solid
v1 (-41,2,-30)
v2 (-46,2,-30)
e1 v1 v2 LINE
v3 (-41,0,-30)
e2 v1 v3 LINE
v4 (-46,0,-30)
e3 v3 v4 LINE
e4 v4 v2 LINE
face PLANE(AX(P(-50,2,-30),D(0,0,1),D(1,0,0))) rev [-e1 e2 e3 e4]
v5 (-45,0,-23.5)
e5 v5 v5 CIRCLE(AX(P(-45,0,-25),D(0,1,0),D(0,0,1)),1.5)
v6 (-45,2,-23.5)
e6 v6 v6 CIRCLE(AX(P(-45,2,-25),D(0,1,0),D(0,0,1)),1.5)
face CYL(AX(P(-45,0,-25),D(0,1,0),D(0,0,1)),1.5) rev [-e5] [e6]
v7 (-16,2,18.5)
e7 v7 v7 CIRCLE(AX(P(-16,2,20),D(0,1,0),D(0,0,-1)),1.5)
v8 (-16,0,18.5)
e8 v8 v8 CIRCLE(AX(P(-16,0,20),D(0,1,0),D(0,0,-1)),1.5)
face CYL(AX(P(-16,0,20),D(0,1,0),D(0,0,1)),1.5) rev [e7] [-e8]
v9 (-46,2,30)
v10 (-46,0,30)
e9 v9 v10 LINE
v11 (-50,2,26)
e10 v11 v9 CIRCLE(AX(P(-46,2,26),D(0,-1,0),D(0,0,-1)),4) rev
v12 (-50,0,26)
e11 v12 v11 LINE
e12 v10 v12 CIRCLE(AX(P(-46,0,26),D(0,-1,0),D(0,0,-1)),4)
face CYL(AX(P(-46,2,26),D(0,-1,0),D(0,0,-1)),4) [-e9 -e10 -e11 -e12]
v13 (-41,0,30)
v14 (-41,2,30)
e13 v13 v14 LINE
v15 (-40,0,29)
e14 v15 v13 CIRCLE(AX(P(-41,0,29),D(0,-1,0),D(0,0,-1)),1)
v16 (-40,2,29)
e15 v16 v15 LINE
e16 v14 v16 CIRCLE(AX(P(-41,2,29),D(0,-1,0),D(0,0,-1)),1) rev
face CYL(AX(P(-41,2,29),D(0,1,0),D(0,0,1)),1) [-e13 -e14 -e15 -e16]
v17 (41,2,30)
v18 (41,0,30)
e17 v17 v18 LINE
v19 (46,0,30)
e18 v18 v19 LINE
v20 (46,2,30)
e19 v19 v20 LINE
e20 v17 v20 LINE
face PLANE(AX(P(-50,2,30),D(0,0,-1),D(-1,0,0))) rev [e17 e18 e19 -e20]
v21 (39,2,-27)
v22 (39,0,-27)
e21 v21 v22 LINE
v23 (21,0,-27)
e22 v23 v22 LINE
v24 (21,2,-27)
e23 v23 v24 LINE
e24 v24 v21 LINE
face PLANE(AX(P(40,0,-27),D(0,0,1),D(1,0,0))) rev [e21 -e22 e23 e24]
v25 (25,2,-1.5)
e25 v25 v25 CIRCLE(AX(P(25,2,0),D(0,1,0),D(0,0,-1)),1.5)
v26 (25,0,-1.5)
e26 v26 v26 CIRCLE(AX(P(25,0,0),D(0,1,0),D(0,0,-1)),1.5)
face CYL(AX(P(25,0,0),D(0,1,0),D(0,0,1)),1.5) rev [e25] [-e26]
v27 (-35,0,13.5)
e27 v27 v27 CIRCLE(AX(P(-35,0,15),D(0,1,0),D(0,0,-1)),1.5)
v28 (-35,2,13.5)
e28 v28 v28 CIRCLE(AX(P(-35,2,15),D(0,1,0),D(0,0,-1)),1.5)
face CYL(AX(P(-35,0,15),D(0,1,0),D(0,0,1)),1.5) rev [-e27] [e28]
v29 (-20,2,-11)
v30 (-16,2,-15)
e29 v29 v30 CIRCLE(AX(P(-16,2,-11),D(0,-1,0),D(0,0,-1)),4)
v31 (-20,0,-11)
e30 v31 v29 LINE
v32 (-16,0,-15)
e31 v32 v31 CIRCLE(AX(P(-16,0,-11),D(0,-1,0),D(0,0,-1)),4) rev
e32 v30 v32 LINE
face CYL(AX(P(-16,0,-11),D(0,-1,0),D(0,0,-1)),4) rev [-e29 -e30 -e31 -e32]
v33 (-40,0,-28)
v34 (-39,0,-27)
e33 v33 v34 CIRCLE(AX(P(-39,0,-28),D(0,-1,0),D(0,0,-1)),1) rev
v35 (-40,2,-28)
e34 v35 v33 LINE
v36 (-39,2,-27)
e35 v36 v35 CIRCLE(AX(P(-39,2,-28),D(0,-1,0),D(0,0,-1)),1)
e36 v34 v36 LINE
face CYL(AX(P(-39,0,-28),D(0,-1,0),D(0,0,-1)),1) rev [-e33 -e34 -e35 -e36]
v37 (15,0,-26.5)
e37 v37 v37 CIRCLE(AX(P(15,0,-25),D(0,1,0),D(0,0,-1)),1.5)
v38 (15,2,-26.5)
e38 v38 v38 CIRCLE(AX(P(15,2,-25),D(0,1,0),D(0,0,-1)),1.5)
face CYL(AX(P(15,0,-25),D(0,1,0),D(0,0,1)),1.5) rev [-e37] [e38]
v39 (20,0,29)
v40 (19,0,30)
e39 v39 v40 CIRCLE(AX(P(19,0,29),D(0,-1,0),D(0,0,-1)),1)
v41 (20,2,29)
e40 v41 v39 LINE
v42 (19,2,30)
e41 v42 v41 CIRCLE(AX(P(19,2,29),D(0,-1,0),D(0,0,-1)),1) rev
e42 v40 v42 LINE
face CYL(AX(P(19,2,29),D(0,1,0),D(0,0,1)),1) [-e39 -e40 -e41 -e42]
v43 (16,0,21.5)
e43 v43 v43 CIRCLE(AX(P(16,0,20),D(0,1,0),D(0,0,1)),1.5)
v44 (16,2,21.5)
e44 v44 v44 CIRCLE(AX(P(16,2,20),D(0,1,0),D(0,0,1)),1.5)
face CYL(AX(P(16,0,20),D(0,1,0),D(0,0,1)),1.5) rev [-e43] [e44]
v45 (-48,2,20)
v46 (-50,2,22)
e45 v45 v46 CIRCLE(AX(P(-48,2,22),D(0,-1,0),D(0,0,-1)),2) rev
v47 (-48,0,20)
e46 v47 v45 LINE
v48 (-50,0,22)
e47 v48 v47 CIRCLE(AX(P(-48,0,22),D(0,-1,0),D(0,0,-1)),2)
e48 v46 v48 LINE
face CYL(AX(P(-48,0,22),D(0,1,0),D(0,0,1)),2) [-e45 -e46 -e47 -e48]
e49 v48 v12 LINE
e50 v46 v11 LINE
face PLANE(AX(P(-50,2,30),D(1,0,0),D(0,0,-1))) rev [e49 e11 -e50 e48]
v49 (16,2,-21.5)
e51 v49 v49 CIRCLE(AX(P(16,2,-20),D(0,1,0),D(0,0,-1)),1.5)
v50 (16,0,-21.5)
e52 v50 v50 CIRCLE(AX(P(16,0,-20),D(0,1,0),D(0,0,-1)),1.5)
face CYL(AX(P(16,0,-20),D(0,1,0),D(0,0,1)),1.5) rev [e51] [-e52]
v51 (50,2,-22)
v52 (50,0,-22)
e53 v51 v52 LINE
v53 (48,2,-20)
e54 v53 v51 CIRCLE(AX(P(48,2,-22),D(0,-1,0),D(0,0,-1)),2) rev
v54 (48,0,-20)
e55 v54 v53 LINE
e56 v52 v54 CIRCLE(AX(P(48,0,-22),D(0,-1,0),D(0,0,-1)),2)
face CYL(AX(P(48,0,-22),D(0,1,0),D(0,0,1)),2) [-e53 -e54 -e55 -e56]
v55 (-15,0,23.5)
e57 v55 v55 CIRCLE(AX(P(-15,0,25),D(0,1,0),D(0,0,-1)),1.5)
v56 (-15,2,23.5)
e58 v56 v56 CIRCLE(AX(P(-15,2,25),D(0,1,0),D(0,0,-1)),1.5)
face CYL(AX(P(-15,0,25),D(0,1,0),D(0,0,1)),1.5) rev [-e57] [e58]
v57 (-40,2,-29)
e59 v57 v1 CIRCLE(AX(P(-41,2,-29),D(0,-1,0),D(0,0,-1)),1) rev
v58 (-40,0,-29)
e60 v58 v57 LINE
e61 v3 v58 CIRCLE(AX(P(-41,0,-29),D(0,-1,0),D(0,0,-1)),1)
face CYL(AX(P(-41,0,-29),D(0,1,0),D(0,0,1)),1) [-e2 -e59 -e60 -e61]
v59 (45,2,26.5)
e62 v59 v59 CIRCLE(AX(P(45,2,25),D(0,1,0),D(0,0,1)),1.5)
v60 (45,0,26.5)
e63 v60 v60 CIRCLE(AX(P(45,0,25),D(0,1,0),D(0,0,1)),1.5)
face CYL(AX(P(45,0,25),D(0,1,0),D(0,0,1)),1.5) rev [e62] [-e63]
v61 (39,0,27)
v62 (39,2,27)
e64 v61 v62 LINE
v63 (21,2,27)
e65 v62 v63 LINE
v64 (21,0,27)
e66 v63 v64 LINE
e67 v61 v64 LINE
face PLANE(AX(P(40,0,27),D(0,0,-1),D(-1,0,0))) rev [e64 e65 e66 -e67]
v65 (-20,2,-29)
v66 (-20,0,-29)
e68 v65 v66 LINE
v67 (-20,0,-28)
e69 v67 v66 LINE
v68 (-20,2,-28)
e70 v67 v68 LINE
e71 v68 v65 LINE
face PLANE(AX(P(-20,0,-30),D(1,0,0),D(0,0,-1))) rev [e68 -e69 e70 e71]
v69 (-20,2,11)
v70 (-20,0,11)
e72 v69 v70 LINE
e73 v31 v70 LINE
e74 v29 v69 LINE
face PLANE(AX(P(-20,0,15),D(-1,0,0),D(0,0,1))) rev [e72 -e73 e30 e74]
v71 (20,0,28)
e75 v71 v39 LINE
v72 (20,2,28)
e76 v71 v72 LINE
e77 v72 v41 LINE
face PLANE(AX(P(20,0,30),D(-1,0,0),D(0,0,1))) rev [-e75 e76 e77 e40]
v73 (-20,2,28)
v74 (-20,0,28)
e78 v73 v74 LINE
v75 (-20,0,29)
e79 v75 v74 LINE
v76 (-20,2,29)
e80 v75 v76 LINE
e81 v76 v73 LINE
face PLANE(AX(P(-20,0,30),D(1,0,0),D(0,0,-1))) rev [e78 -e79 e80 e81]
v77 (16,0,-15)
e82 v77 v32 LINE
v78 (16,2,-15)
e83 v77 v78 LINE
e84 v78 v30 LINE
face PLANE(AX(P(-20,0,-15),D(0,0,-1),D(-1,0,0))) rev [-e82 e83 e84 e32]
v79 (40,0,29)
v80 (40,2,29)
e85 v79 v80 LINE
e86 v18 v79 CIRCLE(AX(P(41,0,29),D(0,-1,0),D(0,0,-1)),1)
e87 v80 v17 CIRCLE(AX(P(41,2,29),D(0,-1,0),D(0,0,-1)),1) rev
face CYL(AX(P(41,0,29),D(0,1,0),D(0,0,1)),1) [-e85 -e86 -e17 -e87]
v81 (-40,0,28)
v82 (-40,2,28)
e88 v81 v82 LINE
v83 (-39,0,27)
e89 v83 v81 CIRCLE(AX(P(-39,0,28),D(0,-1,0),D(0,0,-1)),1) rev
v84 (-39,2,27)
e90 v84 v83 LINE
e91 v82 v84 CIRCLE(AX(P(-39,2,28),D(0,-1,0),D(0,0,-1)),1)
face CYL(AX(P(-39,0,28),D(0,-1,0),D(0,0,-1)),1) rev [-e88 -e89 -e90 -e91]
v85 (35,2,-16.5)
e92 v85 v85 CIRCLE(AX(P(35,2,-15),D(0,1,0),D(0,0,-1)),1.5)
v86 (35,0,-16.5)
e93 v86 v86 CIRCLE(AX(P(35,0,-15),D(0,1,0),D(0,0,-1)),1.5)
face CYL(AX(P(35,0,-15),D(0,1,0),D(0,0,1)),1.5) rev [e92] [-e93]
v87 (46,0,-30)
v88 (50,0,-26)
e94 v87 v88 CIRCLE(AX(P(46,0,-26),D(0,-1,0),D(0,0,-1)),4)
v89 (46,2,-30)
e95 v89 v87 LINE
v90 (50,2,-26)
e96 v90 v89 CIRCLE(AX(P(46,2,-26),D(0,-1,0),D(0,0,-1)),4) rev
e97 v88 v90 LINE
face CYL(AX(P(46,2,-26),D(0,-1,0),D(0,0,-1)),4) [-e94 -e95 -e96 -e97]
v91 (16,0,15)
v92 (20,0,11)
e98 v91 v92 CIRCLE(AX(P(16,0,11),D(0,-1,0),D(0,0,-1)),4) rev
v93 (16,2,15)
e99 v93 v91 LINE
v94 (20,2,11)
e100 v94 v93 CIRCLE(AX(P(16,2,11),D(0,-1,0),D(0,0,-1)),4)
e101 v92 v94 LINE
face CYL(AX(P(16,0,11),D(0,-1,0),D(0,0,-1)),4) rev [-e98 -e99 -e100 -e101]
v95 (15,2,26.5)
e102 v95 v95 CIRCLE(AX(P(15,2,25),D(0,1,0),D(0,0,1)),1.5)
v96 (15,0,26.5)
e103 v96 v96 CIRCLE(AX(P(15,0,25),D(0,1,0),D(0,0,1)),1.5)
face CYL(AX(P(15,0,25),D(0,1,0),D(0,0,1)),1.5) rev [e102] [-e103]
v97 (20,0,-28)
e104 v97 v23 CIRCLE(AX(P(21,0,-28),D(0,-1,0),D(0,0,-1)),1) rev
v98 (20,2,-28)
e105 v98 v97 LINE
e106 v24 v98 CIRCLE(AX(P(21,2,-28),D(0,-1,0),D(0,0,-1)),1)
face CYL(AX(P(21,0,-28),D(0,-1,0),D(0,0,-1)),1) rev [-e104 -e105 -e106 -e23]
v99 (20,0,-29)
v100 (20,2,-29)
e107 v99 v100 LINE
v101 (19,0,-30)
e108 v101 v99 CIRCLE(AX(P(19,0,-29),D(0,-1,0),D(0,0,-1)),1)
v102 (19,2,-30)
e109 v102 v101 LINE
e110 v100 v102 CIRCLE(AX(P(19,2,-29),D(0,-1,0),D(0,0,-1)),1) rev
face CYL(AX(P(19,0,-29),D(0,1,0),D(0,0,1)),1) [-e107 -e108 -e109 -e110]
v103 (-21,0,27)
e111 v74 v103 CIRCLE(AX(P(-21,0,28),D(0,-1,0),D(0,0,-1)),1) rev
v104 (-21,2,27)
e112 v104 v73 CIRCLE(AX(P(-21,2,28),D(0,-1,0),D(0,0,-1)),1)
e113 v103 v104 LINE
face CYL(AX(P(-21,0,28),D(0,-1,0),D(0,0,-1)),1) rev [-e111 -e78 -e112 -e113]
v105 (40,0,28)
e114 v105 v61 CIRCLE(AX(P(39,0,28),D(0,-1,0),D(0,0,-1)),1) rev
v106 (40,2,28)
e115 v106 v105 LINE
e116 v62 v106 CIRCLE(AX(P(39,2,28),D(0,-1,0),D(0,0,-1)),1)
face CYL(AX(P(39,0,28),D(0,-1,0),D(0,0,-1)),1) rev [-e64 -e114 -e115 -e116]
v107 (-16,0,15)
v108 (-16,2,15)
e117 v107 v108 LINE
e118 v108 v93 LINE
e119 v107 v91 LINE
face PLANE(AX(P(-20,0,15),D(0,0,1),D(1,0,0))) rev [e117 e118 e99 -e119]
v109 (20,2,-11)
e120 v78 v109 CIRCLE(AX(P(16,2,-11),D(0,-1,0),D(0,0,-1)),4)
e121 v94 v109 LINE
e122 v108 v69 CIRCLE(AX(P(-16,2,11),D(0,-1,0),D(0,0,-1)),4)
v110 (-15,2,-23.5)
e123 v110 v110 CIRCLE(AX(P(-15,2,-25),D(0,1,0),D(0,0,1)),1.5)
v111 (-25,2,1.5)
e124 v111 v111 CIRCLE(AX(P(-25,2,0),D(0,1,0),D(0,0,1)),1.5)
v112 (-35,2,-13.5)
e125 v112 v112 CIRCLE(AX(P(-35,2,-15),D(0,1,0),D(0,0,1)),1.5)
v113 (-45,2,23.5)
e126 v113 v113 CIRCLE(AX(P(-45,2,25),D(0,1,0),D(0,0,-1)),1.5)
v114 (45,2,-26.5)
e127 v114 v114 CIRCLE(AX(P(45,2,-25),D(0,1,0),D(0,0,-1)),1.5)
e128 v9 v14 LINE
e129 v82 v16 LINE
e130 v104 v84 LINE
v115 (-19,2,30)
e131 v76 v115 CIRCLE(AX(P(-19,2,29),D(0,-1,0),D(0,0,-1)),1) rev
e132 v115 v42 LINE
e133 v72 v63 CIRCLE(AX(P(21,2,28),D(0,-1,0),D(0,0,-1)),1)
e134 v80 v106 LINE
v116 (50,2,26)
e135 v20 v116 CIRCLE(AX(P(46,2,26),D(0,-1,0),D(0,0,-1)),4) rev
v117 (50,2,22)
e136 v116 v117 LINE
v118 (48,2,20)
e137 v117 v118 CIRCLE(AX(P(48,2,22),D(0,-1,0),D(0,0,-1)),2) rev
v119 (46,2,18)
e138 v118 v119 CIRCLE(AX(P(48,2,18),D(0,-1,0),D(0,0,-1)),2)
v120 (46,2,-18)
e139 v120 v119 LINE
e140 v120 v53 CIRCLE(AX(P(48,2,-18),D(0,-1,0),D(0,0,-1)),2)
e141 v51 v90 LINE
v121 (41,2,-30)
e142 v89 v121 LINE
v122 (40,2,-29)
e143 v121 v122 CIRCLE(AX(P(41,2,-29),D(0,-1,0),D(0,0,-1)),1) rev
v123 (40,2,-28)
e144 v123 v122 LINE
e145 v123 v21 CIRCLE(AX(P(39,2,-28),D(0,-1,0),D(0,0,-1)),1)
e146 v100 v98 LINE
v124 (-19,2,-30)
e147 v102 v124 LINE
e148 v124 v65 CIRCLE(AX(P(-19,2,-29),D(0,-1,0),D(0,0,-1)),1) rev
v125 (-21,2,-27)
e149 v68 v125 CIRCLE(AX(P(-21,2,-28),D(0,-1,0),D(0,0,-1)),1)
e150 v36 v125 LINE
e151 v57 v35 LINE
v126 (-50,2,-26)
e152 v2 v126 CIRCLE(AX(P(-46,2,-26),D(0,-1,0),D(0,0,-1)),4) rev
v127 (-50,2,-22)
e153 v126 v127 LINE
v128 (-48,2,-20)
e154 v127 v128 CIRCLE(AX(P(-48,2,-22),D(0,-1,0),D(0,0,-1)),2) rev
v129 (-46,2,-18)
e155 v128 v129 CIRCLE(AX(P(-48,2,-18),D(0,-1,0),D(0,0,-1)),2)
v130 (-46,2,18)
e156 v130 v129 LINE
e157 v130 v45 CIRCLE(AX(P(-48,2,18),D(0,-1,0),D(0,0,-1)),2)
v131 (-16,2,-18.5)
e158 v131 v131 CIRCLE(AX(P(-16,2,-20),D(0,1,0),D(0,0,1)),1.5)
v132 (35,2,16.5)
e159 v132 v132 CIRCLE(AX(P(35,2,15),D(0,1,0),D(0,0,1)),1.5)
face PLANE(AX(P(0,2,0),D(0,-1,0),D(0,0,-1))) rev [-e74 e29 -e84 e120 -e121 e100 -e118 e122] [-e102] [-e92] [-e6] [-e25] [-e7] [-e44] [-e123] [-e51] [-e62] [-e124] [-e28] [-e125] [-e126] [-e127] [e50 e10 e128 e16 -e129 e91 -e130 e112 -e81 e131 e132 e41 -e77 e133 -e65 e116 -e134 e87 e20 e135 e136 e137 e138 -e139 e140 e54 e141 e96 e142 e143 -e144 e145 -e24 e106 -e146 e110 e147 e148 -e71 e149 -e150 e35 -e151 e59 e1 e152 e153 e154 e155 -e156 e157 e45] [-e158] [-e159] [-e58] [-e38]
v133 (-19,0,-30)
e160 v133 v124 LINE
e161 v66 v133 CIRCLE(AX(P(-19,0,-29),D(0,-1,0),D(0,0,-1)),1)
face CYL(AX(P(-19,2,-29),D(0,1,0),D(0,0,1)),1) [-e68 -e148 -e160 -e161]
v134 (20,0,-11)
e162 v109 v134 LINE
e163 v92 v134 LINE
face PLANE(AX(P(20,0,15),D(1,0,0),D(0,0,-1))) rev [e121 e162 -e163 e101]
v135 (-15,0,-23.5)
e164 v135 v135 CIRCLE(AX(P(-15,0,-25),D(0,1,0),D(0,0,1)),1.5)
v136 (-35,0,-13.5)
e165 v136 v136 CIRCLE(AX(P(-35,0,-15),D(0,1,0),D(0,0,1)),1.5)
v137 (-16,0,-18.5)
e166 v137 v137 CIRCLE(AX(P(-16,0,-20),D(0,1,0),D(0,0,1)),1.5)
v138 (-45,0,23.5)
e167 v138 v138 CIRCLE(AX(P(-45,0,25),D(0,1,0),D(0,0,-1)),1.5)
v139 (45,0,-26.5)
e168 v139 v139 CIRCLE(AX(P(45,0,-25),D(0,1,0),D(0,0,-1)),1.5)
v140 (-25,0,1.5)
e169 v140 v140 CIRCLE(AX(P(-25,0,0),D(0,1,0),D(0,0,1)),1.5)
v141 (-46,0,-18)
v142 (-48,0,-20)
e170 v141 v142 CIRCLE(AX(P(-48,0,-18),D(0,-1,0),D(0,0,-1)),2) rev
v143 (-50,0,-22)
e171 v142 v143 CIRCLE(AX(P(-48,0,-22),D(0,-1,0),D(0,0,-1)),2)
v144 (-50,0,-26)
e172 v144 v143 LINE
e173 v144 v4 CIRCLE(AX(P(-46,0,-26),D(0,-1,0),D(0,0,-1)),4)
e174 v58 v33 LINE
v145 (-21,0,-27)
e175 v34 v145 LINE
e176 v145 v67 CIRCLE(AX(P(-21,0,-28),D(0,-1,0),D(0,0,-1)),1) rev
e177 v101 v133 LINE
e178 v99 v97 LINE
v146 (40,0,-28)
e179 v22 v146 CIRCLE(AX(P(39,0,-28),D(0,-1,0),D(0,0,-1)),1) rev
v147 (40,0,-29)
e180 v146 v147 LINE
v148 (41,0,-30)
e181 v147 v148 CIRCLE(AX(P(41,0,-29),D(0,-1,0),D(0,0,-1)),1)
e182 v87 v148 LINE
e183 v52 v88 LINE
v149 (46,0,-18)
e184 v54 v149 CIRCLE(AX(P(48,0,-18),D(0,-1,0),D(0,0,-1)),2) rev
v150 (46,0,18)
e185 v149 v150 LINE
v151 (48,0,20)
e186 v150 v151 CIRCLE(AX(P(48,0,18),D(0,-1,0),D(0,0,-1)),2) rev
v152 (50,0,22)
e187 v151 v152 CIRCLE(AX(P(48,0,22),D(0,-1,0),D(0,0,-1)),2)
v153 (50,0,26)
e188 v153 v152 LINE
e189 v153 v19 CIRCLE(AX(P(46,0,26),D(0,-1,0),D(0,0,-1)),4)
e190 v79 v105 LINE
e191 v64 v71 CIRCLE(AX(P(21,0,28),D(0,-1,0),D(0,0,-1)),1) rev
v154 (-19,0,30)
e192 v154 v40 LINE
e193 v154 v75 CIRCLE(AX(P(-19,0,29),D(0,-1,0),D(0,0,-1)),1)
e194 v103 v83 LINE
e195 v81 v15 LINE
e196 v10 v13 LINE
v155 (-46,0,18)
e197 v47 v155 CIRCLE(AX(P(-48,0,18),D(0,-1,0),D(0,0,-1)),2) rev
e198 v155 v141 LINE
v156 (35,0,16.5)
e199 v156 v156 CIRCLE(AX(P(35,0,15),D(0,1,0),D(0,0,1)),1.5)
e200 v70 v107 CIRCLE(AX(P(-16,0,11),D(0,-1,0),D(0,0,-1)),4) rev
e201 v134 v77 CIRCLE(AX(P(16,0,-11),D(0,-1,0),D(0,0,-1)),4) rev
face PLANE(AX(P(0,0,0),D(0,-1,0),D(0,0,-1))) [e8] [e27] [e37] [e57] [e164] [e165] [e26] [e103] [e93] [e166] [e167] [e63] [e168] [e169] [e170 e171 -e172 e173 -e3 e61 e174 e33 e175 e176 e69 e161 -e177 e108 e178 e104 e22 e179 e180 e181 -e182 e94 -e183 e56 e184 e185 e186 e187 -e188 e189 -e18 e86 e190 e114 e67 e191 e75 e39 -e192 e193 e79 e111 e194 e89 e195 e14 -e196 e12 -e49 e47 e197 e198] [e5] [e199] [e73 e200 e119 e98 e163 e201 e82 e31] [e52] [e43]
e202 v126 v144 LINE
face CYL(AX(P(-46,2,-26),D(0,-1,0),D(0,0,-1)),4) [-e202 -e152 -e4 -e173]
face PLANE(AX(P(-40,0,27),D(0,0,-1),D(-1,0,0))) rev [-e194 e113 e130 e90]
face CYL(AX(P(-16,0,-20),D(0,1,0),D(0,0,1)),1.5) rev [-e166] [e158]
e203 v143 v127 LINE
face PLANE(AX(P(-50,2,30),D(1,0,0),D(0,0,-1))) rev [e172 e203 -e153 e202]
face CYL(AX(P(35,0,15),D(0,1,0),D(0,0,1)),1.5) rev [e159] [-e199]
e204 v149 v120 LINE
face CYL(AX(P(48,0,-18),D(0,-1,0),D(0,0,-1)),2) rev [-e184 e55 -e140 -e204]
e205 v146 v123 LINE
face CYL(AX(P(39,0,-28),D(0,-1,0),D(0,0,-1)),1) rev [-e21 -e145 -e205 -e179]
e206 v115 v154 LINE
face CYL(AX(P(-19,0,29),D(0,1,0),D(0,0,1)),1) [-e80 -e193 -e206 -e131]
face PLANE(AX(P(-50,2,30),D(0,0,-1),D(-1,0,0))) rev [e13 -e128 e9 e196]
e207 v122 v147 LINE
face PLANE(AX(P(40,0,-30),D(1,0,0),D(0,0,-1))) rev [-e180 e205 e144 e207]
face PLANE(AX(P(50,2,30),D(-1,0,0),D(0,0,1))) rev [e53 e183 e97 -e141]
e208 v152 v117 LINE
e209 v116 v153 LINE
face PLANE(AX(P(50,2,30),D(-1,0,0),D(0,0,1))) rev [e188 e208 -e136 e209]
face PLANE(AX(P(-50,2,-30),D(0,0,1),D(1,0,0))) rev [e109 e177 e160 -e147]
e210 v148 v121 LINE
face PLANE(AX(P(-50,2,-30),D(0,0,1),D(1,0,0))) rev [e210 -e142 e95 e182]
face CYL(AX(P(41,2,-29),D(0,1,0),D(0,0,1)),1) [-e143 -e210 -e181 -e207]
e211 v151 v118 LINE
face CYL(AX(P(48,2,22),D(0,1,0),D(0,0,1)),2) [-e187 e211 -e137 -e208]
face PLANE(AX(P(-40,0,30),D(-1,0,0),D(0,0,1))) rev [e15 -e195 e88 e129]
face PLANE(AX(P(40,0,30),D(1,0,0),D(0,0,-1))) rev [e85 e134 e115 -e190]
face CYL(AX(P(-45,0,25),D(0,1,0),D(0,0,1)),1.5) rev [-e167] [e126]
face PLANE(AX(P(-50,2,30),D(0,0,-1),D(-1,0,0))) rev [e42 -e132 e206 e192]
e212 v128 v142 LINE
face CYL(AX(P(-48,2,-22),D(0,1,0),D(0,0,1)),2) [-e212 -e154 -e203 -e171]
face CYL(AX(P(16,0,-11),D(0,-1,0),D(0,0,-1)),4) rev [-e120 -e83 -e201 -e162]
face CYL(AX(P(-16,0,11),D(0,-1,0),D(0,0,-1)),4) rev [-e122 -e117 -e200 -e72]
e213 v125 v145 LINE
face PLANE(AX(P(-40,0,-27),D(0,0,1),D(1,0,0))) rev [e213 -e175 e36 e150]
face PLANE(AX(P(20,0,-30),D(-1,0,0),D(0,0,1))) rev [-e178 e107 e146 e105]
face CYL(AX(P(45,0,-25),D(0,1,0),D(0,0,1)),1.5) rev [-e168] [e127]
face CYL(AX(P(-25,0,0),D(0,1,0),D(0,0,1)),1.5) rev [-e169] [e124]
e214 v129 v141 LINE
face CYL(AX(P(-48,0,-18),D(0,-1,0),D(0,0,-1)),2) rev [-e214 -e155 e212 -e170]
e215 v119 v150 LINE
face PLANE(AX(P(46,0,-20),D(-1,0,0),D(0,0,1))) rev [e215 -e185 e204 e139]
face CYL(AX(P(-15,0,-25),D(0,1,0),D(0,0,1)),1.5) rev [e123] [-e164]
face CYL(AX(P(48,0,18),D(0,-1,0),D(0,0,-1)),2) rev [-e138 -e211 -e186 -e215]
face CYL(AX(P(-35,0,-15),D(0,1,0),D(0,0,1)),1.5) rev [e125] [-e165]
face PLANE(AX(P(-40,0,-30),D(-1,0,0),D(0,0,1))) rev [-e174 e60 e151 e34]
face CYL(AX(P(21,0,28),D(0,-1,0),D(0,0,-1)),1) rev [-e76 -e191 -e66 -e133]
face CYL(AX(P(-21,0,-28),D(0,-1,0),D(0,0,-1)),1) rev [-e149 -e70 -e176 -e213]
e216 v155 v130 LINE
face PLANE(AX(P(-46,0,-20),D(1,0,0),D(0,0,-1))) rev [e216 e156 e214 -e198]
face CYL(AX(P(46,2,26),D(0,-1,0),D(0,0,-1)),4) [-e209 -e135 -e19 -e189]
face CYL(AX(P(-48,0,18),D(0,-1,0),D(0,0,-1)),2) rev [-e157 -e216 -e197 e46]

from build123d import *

# Parameters (mm, degrees)
SKETCH_1_W           = 100
SKETCH_1_H           = 60
EXTRUDE_1_DEPTH      = 2
SKETCH_4_W           = 40
SKETCH_4_H           = 30
CUT_EXTRUDE_3_DEPTH  = 59.343808583
SKETCH_6_R           = 1.5
CUT_EXTRUDE_5_DEPTH  = 59.343808583
SKETCH_7_W           = 20
SKETCH_7_H           = 3
CUT_EXTRUDE_6_DEPTH  = 59.343808583
FILLET_1_R           = 4
FILLET_2_R           = 1
SKETCH_8_R           = 1.5
CUT_EXTRUDE_7_DEPTH  = 59.343808583
SKETCH_9_W           = 4
SKETCH_9_H           = 40
CUT_EXTRUDE_9_DEPTH  = 59.343808583
FILLET_START         = -1
FILLET_3_DEPTH       = 4
FILLET_3_2_DEPTH     = 2
SKETCH_10_R          = 1.5
CUT_EXTRUDE_10_DEPTH = 59.343808583


with BuildPart() as part:
    # 草图1 → 凸台-拉伸1 (new body)
    with BuildSketch(Plane(origin=(0, 0, 0), x_dir=(1, 0, 0), z_dir=(0, 1, 0))):
        Rectangle(SKETCH_1_W, SKETCH_1_H)
    extrude(amount=EXTRUDE_1_DEPTH)

    # 草图4 → 切除-拉伸3 (cut, through all)
    with BuildSketch(Plane(origin=(0, 2, 0), x_dir=(1, 0, 0), z_dir=(0, 1, 0))):
        Rectangle(SKETCH_4_W, SKETCH_4_H)
    extrude(amount=-CUT_EXTRUDE_3_DEPTH, mode=Mode.SUBTRACT)

    # 草图6 → 切除-拉伸5 (cut, through all)
    with BuildSketch(Plane(origin=(0, 2, 0), x_dir=(1, 0, 0), z_dir=(0, 1, 0))):
        with Locations(Location((-45, 25, 0), (0, 0, 270))):
            Circle(SKETCH_6_R)
        with Locations(Location((-45, -25, 0), (0, 0, 90))):
            Circle(SKETCH_6_R)
        with Locations(Location((45, -25, 0), (0, 0, 270))):
            Circle(SKETCH_6_R)
        with Locations(Location((45, 25, 0), (0, 0, 90))):
            Circle(SKETCH_6_R)
    extrude(amount=-CUT_EXTRUDE_5_DEPTH, mode=Mode.SUBTRACT)

    # 草图7 → 切除-拉伸6 (cut, through all)
    with BuildSketch(Plane(origin=(0, 2, 0), x_dir=(1, 0, 0), z_dir=(0, 1, 0))):
        with Locations((-30, 28.5)):
            Rectangle(SKETCH_7_W, SKETCH_7_H)
        with Locations((-30, -28.5)):
            Rectangle(SKETCH_7_W, SKETCH_7_H)
        with Locations((30, -28.5)):
            Rectangle(SKETCH_7_W, SKETCH_7_H)
        with Locations((30, 28.5)):
            Rectangle(SKETCH_7_W, SKETCH_7_H)
    extrude(amount=-CUT_EXTRUDE_6_DEPTH, mode=Mode.SUBTRACT)

    # 圆角1
    fillet_1_edges = [part.edges().sort_by_distance(p)[0] for p in [
        (20, 1, -15),
        (20, 1, 15),
        (-20, 1, 15),
        (-20, 1, -15),
        (50, 1, 30),
        (-50, 1, 30),
        (-50, 1, -30),
        (50, 1, -30),
    ]]
    fillet(fillet_1_edges, radius=FILLET_1_R)

    # 圆角2
    fillet_2_edges = [part.edges().sort_by_distance(p)[0] for p in [
        (40, 1, -30),
        (40, 1, -27),
        (20, 1, -27),
        (20, 1, -30),
        (40, 1, 30),
        (20, 1, 30),
        (20, 1, 27),
        (40, 1, 27),
        (-40, 1, 30),
        (-40, 1, 27),
        (-20, 1, 27),
        (-20, 1, 30),
        (-40, 1, -27),
        (-40, 1, -30),
        (-20, 1, -30),
        (-20, 1, -27),
    ]]
    fillet(fillet_2_edges, radius=FILLET_2_R)

    # 草图8 → 切除-拉伸7 (cut, through all)
    with BuildSketch(Plane(origin=(0, 2, 0), x_dir=(1, 0, 0), z_dir=(0, 1, 0))):
        with Locations(Location((-15, 25, 0), (0, 0, 270))):
            Circle(SKETCH_8_R)
        with Locations(Location((-15, -25, 0), (0, 0, 90))):
            Circle(SKETCH_8_R)
        with Locations(Location((15, -25, 0), (0, 0, 270))):
            Circle(SKETCH_8_R)
        with Locations(Location((15, 25, 0), (0, 0, 90))):
            Circle(SKETCH_8_R)
    extrude(amount=-CUT_EXTRUDE_7_DEPTH, mode=Mode.SUBTRACT)

    # 草图9 → 切除-拉伸9 (cut, through all)
    with BuildSketch(Plane(origin=(0, 2, 0), x_dir=(1, 0, 0), z_dir=(0, 1, 0))):
        with Locations((-48, 0)):
            Rectangle(SKETCH_9_W, SKETCH_9_H)
        with Locations((48, 0)):
            Rectangle(SKETCH_9_W, SKETCH_9_H)
    extrude(amount=-CUT_EXTRUDE_9_DEPTH, mode=Mode.SUBTRACT)

    # 圆角3: read off the stored shape, not the designer's step
    # 圆角3 outline → 圆角3 (cut)
    with BuildSketch(Plane(origin=(0, 0, 0), x_dir=(1, 0, 0), z_dir=(0, 1, 0)).offset(FILLET_START)):
        with BuildLine():
            Line((50, -20), (48, -20))
            ThreePointArc((48, -20), (49.414213562, -20.585786438), (50, -22))
            Line((50, -22), (50, -20))
        make_face()
        with BuildLine():
            ThreePointArc((50, 22), (49.414213562, 20.585786438), (48, 20))
            Line((48, 20), (50, 20))
            Line((50, 20), (50, 22))
        make_face()
        with BuildLine():
            Line((-50, 20), (-48, 20))
            ThreePointArc((-48, 20), (-49.414213562, 20.585786438), (-50, 22))
            Line((-50, 22), (-50, 20))
        make_face()
        with BuildLine():
            ThreePointArc((-50, -22), (-49.414213562, -20.585786438), (-48, -20))
            Line((-48, -20), (-50, -20))
            Line((-50, -20), (-50, -22))
        make_face()
    extrude(amount=FILLET_3_DEPTH, mode=Mode.SUBTRACT)

    # Fillet 3 2 outline → Fillet 3 2 (add)
    with BuildSketch(Plane(origin=(0, 0, 0), x_dir=(1, 0, 0), z_dir=(0, 1, 0))):
        with BuildLine():
            Line((46, -20), (48, -20))
            ThreePointArc((48, -20), (46.585786438, -19.414213562), (46, -18))
            Line((46, -18), (46, -20))
        make_face()
        with BuildLine():
            Line((46, 20), (46, 18))
            ThreePointArc((46, 18), (46.585786438, 19.414213562), (48, 20))
            Line((48, 20), (46, 20))
        make_face()
        with BuildLine():
            ThreePointArc((-48, 20), (-46.585786438, 19.414213562), (-46, 18))
            Line((-46, 18), (-46, 20))
            Line((-46, 20), (-48, 20))
        make_face()
        with BuildLine():
            ThreePointArc((-46, -18), (-46.585786438, -19.414213562), (-48, -20))
            Line((-48, -20), (-46, -20))
            Line((-46, -20), (-46, -18))
        make_face()
    extrude(amount=FILLET_3_2_DEPTH)

    # 草图10 → 切除-拉伸10 (cut, through all)
    with BuildSketch(Plane(origin=(0, 2, 0), x_dir=(1, 0, 0), z_dir=(0, 1, 0))):
        with Locations(Location((-25, 0, 0), (0, 0, 270))):
            Circle(SKETCH_10_R)
        with Locations(Location((-16, 20, 0), (0, 0, 270))):
            Circle(SKETCH_10_R)
        with Locations(Location((-16, -20, 0), (0, 0, 90))):
            Circle(SKETCH_10_R)
        with Locations(Location((16, 20, 0), (0, 0, 90))):
            Circle(SKETCH_10_R)
        with Locations(Location((16, -20, 0), (0, 0, 270))):
            Circle(SKETCH_10_R)
        with Locations(Location((25, 0, 0), (0, 0, 90))):
            Circle(SKETCH_10_R)
        with Locations(Location((-35, 15, 0), (0, 0, 270))):
            Circle(SKETCH_10_R)
        with Locations(Location((-35, -15, 0), (0, 0, 90))):
            Circle(SKETCH_10_R)
        with Locations(Location((35, -15, 0), (0, 0, 270))):
            Circle(SKETCH_10_R)
        with Locations(Location((35, 15, 0), (0, 0, 90))):
            Circle(SKETCH_10_R)
    extrude(amount=-CUT_EXTRUDE_10_DEPTH, mode=Mode.SUBTRACT)


solid = part.part
